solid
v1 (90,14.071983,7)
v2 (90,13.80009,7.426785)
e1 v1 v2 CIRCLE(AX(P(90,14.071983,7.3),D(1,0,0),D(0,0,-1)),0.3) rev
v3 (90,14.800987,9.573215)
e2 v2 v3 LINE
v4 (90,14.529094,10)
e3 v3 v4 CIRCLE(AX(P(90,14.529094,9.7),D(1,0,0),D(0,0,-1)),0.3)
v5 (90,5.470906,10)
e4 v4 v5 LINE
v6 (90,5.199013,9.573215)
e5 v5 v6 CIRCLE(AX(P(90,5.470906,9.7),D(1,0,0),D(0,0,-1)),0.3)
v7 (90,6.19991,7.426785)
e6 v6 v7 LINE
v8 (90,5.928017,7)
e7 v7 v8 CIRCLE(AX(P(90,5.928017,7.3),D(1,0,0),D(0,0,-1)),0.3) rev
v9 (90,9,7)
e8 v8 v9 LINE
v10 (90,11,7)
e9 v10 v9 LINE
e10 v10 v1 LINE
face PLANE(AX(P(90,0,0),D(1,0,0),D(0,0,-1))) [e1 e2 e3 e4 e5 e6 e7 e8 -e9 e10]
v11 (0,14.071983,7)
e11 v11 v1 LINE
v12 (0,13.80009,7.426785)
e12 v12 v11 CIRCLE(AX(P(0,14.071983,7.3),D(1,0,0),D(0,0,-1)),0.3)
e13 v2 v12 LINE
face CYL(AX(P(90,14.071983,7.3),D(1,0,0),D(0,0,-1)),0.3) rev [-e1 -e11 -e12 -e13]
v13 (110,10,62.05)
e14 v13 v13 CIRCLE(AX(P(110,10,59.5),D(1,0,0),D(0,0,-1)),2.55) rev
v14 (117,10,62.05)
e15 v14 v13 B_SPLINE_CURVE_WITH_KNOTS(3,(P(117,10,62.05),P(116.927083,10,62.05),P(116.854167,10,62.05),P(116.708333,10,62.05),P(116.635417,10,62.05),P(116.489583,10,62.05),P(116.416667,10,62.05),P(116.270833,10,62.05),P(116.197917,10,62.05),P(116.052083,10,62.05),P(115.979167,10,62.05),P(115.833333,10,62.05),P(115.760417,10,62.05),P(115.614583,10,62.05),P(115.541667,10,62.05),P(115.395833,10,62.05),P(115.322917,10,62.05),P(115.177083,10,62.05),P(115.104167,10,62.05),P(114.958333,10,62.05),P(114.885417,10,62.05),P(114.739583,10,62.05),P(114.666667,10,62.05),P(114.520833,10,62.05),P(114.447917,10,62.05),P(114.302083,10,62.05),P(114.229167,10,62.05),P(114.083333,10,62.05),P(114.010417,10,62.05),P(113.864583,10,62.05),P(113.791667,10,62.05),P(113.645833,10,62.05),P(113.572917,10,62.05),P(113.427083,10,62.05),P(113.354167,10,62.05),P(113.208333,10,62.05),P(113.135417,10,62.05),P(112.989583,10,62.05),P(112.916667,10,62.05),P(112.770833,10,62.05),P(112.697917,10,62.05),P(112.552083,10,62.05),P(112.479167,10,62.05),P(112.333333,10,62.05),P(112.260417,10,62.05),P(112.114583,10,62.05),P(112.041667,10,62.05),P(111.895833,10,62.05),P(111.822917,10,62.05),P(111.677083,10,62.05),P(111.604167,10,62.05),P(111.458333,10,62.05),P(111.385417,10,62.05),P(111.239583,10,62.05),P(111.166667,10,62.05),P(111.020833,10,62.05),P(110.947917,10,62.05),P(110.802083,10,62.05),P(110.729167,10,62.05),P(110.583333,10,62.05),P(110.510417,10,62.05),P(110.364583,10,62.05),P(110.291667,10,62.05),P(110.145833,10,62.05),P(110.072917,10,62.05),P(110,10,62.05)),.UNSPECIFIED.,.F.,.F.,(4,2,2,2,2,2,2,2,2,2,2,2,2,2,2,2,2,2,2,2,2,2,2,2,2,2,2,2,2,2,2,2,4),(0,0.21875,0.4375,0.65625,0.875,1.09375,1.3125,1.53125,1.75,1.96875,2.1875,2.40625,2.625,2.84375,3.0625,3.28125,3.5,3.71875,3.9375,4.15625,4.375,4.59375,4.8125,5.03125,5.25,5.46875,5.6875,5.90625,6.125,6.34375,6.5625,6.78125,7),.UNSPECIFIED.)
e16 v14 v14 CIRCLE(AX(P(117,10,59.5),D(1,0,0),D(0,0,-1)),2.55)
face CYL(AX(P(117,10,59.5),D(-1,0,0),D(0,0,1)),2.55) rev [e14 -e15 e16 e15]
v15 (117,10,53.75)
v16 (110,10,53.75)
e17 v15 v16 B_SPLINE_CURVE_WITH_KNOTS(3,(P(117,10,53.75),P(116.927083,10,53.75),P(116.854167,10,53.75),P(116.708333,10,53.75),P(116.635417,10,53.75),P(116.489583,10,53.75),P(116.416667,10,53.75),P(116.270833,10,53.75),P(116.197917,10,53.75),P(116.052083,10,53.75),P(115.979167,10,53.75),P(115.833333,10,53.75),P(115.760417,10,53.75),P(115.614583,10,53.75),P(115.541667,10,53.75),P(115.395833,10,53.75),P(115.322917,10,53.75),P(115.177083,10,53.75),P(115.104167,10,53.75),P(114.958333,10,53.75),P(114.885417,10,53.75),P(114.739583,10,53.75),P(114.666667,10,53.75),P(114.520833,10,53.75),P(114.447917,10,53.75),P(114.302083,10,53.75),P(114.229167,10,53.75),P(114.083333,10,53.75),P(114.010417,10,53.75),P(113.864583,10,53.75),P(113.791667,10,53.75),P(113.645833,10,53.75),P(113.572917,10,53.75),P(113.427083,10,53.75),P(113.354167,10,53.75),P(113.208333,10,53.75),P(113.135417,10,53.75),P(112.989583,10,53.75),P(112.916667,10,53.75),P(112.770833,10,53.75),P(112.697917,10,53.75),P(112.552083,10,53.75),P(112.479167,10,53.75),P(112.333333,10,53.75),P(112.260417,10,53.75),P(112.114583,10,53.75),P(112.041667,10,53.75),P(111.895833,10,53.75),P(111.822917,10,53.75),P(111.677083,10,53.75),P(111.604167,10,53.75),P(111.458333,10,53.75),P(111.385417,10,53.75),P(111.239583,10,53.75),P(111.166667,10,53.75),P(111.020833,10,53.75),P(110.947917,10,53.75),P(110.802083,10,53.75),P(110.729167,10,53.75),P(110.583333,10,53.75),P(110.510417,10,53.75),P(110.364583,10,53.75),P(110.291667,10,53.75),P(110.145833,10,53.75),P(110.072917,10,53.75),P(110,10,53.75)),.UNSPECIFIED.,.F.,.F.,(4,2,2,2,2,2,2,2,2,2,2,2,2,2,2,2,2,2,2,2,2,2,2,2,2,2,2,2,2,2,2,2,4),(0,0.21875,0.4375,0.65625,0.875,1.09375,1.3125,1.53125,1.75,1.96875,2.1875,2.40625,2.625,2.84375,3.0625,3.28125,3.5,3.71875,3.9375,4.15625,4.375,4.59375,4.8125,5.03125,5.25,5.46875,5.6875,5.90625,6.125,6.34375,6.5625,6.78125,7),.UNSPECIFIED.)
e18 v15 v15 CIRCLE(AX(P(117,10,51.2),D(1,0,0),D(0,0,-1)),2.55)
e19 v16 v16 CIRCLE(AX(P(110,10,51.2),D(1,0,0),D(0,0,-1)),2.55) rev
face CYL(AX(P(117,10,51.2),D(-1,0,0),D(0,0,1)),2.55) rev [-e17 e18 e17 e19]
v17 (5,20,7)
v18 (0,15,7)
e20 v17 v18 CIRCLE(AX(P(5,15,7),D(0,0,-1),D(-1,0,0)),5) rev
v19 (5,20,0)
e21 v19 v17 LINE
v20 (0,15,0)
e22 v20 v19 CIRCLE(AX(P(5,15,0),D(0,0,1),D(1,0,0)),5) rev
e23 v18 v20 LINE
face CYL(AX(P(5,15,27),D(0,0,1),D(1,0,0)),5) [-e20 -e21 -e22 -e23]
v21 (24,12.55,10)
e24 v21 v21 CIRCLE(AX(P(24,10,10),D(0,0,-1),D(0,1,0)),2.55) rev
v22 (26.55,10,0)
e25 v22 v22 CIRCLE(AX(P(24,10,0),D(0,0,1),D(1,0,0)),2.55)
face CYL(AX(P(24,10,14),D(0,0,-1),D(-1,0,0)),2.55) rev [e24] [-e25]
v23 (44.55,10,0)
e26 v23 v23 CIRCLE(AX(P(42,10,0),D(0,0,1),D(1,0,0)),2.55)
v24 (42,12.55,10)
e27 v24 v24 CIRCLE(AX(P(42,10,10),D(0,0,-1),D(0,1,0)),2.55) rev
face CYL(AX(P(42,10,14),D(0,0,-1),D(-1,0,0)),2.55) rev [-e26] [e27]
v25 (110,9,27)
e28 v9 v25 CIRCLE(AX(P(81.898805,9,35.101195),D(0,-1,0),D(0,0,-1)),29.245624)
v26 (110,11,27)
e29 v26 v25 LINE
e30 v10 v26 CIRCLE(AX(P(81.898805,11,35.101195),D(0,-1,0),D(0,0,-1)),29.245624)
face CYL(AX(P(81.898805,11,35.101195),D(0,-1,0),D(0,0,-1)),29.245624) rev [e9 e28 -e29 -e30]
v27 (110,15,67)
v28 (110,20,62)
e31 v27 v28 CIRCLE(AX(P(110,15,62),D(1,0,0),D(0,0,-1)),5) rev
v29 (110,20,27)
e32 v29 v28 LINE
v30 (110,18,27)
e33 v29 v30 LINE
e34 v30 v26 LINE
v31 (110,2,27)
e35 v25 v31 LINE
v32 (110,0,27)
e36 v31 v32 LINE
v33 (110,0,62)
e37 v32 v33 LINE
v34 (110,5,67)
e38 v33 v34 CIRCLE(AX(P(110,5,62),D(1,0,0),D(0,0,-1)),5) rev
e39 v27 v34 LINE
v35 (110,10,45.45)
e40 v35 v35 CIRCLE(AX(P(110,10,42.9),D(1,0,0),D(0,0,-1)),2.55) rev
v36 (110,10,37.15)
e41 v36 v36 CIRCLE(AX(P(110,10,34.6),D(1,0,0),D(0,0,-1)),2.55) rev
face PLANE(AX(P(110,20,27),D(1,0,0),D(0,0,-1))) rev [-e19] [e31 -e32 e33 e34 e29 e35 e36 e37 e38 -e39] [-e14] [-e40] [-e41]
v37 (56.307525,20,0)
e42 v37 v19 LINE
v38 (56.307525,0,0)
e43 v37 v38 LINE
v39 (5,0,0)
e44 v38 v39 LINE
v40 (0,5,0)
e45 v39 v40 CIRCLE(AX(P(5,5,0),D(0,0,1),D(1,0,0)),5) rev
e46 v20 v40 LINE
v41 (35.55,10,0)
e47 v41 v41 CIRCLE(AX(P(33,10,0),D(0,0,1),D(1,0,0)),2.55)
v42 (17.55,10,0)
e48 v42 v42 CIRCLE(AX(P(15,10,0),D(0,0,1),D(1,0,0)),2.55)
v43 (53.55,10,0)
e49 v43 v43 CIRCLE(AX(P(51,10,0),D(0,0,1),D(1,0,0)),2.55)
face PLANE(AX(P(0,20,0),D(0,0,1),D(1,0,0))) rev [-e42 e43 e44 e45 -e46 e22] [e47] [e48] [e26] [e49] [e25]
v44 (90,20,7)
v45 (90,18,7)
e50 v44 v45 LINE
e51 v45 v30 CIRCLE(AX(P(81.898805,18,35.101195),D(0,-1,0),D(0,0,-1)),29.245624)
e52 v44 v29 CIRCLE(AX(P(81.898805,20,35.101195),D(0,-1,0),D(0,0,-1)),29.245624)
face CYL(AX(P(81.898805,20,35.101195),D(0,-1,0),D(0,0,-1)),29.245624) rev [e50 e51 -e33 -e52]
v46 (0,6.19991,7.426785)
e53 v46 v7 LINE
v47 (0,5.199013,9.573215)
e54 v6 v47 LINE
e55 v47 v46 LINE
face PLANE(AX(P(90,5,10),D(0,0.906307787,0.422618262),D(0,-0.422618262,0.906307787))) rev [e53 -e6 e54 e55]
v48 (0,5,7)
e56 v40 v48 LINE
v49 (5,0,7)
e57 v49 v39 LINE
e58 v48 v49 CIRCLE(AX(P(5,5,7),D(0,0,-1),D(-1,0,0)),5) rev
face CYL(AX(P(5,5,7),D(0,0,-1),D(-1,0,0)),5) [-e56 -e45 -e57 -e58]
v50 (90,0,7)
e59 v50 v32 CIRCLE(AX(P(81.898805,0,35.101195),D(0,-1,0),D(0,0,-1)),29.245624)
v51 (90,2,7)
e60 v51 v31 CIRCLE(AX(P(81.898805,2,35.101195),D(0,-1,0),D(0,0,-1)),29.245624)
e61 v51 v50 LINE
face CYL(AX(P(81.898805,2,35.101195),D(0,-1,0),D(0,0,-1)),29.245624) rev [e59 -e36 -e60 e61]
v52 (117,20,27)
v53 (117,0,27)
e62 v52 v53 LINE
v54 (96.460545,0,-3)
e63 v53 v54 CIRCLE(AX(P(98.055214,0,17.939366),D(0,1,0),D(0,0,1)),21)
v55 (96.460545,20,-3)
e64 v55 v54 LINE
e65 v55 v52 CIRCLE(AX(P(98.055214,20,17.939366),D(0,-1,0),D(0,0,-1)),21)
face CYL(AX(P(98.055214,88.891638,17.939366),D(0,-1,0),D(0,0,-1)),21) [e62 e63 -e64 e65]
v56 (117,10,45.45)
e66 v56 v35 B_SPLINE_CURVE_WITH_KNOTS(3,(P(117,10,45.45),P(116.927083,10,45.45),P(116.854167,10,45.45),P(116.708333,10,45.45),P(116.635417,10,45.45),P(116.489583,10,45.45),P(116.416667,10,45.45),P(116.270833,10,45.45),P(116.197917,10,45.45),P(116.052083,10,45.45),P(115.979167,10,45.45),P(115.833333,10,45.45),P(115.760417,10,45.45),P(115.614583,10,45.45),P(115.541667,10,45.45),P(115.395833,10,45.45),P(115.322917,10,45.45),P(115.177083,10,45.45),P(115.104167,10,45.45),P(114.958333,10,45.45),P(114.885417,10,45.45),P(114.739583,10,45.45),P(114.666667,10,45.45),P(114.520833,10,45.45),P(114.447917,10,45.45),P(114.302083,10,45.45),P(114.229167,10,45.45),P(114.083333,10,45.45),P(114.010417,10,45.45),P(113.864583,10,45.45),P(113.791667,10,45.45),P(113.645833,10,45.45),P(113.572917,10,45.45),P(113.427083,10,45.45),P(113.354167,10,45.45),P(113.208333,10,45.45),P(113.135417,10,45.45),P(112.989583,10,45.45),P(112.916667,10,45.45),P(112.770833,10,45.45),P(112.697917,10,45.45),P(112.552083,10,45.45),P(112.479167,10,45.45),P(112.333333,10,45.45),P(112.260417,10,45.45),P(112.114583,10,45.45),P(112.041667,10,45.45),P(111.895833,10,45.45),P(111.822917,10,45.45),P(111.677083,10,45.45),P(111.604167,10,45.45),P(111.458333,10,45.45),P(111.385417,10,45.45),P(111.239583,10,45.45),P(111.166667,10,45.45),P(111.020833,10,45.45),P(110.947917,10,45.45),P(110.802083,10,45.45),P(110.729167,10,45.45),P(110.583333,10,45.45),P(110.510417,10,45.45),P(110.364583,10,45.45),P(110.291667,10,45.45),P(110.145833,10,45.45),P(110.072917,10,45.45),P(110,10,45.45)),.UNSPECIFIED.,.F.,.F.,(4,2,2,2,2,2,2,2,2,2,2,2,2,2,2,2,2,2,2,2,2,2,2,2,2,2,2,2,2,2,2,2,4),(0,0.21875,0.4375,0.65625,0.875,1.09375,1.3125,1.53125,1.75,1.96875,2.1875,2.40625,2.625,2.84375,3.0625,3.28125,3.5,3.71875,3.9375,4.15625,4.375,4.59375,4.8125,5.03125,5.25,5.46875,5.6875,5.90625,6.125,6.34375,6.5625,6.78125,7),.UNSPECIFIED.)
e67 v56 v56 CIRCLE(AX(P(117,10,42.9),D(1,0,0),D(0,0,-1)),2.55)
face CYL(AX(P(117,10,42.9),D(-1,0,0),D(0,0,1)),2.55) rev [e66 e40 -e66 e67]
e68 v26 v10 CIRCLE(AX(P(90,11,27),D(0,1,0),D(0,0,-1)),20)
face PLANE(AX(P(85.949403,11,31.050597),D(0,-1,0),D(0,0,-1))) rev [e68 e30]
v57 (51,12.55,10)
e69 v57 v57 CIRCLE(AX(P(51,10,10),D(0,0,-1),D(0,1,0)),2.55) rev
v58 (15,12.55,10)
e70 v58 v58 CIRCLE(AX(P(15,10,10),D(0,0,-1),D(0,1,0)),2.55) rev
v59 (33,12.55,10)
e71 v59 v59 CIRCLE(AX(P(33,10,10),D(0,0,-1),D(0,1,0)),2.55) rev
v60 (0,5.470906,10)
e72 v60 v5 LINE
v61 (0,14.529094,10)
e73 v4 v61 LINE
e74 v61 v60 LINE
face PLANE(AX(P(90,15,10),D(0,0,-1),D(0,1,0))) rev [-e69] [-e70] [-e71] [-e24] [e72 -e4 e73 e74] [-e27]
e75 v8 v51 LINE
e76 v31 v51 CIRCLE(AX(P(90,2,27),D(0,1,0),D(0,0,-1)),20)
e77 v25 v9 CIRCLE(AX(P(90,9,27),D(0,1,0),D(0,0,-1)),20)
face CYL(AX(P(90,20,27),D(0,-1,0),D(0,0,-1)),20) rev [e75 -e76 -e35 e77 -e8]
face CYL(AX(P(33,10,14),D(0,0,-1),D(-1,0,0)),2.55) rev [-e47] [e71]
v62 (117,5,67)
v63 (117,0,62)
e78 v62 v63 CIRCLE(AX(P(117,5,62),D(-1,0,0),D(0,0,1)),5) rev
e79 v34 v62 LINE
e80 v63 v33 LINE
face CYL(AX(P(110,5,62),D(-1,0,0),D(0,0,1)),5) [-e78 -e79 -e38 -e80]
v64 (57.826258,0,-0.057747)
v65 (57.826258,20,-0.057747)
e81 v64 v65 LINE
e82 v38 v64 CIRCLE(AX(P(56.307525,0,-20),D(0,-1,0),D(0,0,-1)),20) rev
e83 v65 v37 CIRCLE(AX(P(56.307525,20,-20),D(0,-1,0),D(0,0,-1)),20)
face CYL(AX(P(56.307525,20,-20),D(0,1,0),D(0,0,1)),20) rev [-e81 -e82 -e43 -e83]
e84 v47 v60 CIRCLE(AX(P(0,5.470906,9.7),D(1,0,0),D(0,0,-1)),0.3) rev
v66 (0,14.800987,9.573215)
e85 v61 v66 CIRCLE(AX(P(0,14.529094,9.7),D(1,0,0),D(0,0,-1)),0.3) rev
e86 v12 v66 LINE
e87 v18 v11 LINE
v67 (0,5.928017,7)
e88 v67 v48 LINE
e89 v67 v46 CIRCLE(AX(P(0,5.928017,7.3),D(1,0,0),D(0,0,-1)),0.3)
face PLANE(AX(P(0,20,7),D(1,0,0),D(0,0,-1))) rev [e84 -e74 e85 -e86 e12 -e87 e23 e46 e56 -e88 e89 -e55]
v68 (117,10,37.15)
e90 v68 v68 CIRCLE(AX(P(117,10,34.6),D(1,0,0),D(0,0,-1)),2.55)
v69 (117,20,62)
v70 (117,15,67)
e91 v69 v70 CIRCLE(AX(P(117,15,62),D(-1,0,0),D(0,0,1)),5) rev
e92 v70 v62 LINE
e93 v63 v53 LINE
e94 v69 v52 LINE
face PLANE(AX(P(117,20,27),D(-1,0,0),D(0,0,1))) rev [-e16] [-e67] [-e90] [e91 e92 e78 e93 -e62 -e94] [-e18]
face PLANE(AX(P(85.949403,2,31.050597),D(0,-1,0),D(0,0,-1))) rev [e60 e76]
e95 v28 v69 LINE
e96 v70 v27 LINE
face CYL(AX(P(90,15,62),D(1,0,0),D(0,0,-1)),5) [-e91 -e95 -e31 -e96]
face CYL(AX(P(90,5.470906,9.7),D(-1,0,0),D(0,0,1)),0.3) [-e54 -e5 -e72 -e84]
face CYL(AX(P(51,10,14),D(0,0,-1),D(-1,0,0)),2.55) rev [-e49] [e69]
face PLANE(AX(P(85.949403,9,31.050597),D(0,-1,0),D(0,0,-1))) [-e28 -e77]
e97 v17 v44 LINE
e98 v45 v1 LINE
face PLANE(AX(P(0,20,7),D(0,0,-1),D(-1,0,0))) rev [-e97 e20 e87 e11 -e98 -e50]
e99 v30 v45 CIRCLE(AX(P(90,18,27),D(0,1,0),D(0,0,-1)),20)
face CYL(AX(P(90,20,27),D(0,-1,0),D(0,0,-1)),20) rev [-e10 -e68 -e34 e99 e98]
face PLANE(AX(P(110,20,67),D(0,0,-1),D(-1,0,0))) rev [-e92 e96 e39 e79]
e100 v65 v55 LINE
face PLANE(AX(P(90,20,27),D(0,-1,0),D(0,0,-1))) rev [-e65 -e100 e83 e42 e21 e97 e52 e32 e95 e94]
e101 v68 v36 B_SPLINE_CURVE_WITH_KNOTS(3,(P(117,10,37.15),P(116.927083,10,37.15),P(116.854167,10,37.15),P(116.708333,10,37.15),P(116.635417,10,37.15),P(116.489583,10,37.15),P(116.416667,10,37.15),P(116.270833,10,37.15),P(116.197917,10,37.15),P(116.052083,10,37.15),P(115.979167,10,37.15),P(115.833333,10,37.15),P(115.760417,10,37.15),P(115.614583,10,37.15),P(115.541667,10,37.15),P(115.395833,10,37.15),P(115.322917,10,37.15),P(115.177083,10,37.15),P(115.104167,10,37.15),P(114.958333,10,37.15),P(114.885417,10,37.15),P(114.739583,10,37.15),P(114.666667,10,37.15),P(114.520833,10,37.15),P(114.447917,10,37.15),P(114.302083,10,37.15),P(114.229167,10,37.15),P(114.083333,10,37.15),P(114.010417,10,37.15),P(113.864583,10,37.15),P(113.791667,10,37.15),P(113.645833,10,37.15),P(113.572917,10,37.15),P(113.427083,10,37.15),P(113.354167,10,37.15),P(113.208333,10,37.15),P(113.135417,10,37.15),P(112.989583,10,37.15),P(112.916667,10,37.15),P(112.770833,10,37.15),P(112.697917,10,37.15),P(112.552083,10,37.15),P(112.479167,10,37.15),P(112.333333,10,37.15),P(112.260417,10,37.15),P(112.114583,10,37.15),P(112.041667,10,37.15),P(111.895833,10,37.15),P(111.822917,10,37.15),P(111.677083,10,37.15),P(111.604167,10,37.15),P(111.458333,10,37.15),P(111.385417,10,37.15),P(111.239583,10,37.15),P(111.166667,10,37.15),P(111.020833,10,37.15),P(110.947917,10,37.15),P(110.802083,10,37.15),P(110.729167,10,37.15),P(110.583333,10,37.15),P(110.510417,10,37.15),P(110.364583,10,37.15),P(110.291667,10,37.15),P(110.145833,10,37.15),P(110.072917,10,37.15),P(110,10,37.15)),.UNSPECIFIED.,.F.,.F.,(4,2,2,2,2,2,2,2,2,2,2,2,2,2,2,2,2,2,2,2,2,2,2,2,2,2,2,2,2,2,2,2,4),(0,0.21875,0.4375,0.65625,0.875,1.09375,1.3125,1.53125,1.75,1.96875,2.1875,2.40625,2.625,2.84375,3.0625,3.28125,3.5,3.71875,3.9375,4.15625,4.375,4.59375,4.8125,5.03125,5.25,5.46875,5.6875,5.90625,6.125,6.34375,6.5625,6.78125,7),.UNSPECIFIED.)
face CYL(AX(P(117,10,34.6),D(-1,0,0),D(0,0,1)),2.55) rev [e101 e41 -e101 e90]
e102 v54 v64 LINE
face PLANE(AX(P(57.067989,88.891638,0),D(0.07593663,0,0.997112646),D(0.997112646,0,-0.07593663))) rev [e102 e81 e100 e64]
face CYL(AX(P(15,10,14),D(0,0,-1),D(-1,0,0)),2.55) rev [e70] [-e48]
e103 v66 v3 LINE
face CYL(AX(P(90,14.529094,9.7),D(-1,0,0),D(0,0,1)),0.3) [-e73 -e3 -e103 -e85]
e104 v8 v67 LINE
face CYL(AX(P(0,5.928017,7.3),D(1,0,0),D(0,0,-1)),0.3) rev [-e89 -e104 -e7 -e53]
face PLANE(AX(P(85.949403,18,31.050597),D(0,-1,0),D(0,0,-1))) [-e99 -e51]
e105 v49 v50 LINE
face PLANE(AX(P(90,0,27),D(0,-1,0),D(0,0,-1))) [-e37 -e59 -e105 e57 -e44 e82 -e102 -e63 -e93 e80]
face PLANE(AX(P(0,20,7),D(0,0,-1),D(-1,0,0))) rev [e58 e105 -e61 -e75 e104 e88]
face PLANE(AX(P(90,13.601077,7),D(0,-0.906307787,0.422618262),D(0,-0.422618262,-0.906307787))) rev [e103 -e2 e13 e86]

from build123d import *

# Parameters (mm, degrees)
BOSS_EXTRUDE1_DEPTH = 20
BOSS_EXTRUDE2_DEPTH = 90
SKETCH4_R           = 2.55
CUT_EXTRUDE1_DEPTH  = 137.301137193
LPATTERN1_COUNT     = 4
LPATTERN1_PITCH     = 8.3
SKETCH5_R           = 2.55
CUT_EXTRUDE2_DEPTH  = 14
LPATTERN2_COUNT     = 5
LPATTERN2_PITCH     = 9
FILLET2_R           = 5
BOSS_EXTRUDE4_DEPTH = 20
BOSS_EXTRUDE5_DEPTH = 2
LPATTERN3_COUNT     = 3
LPATTERN3_PITCH     = 9
FILLET3_R           = 0.3
FILLET4_R           = 20


with BuildPart() as part:
    # Sketch1 → Boss-Extrude1 (new body)
    with BuildSketch(Plane(origin=(0, 0, 0), x_dir=(1, 0, 0), z_dir=(0, 1, 0))):
        with BuildLine():
            Line((0, 0), (90, 0))
            ThreePointArc((90, 0), (109.091883092, -7.908116908), (117, -27))
            Line((117, -27), (117, -67))
            Line((117, -67), (110, -67))
            Line((110, -67), (110, -27))
            ThreePointArc((110, -27), (104.142135624, -12.857864376), (90, -7))
            Line((90, -7), (0, -7))
            Line((0, -7), (0, 0))
        make_face()
    extrude(amount=BOSS_EXTRUDE1_DEPTH)

    # Sketch2 → Boss-Extrude2 (add)
    with BuildSketch(Plane(origin=(0, 0, 0), x_dir=(0, 0, -1), z_dir=(1, 0, 0))):
        Polygon((-10, 15), (-10, 5), (-7, 6.398922974), (-7, 13.601077026), align=None)
    extrude(amount=BOSS_EXTRUDE2_DEPTH)

    # Sketch4 → Cut-Extrude1 (cut, through all)
    with BuildSketch(Plane(origin=(0, 0, 0), x_dir=(0, 0, -1), z_dir=(1, 0, 0))):
        with Locations(Location((-59.5, 10, 0), (0, 0, 180))):
            Circle(SKETCH4_R)
    cut_extrude1 = extrude(amount=CUT_EXTRUDE1_DEPTH, mode=Mode.SUBTRACT)

    # LPattern1: Cut-Extrude1 ×4
    with Locations(*[(0, 0, -i * LPATTERN1_PITCH) for i in range(1, LPATTERN1_COUNT)]):
        add(cut_extrude1, mode=Mode.SUBTRACT)

    # Sketch5 → Cut-Extrude2 (cut)
    with BuildSketch(Plane.XY):
        with Locations(Location((15, 10, 0), (0, 0, 90))):
            Circle(SKETCH5_R)
    cut_extrude2 = extrude(amount=CUT_EXTRUDE2_DEPTH, mode=Mode.SUBTRACT)

    # LPattern2: Cut-Extrude2 ×5
    with Locations(*[(i * LPATTERN2_PITCH, 0, 0) for i in range(1, LPATTERN2_COUNT)]):
        add(cut_extrude2, mode=Mode.SUBTRACT)

    # Fillet2
    fillet2_edges = [part.edges().sort_by_distance(p)[0] for p in [
        (0, 0, 3.5),
        (113.5, 20, 67),
        (0, 20, 3.5),
        (113.5, 0, 67),
    ]]
    fillet(fillet2_edges, radius=FILLET2_R)

    # Sketch6 → Boss-Extrude4 (add)
    with BuildSketch(Plane(origin=(0, 0, 0), x_dir=(1, 0, 0), z_dir=(0, 1, 0))):
        with BuildLine():
            Line((57.067989457, 0), (96.460545107, 3))
            ThreePointArc((96.460545107, 3), (115.383129249, -6.075834674), (117, -27))
            ThreePointArc((117, -27), (109.091883092, -7.908116908), (90, 0))
            Line((90, 0), (57.067989457, 0))
        make_face()
    extrude(amount=BOSS_EXTRUDE4_DEPTH)

    # Sketch8 → Boss-Extrude5 (add)
    with BuildSketch(Plane(origin=(0, 0, 0), x_dir=(1, 0, 0), z_dir=(0, 1, 0))):
        with BuildLine():
            ThreePointArc((90, -7), (102.578584062, -14.421415938), (110, -27))
            ThreePointArc((110, -27), (104.142135624, -12.857864376), (90, -7))
        make_face()
    boss_extrude5 = extrude(amount=BOSS_EXTRUDE5_DEPTH)

    # LPattern3: Boss-Extrude5 ×3
    with Locations(*[(0, i * LPATTERN3_PITCH, 0) for i in range(1, LPATTERN3_COUNT)]):
        add(boss_extrude5)

    # Fillet3
    fillet3_edges = [part.edges().sort_by_distance(p)[0] for p in [
        (45, 13.601077026, 7),
        (45, 15, 10),
        (45, 5, 10),
        (45, 6.398922974, 7),
    ]]
    fillet(fillet3_edges, radius=FILLET3_R)

    # Fillet4
    # the kernel refuses this fillet: 20 mm, written as the material it adds along each edge
    with BuildSketch(Plane(origin=(57.067989457, 0, 0), x_dir=(0.9971126456779296, 0, -0.07593663035162816), z_dir=(0, 1, 0))) as fillet4_piece_1:
        with BuildLine():
            CenterArc((FILLET4_R * 0.0380232084134, FILLET4_R), FILLET4_R, 265.644959248, 4.355040752)
            Line((-FILLET4_R * 0.0379134219382, FILLET4_R * 0.00288735432207), (0, 0))
            Line((0, 0), (FILLET4_R * 0.0380232084134, 0))
        make_face()
    extrude(amount=20)


solid = part.part
